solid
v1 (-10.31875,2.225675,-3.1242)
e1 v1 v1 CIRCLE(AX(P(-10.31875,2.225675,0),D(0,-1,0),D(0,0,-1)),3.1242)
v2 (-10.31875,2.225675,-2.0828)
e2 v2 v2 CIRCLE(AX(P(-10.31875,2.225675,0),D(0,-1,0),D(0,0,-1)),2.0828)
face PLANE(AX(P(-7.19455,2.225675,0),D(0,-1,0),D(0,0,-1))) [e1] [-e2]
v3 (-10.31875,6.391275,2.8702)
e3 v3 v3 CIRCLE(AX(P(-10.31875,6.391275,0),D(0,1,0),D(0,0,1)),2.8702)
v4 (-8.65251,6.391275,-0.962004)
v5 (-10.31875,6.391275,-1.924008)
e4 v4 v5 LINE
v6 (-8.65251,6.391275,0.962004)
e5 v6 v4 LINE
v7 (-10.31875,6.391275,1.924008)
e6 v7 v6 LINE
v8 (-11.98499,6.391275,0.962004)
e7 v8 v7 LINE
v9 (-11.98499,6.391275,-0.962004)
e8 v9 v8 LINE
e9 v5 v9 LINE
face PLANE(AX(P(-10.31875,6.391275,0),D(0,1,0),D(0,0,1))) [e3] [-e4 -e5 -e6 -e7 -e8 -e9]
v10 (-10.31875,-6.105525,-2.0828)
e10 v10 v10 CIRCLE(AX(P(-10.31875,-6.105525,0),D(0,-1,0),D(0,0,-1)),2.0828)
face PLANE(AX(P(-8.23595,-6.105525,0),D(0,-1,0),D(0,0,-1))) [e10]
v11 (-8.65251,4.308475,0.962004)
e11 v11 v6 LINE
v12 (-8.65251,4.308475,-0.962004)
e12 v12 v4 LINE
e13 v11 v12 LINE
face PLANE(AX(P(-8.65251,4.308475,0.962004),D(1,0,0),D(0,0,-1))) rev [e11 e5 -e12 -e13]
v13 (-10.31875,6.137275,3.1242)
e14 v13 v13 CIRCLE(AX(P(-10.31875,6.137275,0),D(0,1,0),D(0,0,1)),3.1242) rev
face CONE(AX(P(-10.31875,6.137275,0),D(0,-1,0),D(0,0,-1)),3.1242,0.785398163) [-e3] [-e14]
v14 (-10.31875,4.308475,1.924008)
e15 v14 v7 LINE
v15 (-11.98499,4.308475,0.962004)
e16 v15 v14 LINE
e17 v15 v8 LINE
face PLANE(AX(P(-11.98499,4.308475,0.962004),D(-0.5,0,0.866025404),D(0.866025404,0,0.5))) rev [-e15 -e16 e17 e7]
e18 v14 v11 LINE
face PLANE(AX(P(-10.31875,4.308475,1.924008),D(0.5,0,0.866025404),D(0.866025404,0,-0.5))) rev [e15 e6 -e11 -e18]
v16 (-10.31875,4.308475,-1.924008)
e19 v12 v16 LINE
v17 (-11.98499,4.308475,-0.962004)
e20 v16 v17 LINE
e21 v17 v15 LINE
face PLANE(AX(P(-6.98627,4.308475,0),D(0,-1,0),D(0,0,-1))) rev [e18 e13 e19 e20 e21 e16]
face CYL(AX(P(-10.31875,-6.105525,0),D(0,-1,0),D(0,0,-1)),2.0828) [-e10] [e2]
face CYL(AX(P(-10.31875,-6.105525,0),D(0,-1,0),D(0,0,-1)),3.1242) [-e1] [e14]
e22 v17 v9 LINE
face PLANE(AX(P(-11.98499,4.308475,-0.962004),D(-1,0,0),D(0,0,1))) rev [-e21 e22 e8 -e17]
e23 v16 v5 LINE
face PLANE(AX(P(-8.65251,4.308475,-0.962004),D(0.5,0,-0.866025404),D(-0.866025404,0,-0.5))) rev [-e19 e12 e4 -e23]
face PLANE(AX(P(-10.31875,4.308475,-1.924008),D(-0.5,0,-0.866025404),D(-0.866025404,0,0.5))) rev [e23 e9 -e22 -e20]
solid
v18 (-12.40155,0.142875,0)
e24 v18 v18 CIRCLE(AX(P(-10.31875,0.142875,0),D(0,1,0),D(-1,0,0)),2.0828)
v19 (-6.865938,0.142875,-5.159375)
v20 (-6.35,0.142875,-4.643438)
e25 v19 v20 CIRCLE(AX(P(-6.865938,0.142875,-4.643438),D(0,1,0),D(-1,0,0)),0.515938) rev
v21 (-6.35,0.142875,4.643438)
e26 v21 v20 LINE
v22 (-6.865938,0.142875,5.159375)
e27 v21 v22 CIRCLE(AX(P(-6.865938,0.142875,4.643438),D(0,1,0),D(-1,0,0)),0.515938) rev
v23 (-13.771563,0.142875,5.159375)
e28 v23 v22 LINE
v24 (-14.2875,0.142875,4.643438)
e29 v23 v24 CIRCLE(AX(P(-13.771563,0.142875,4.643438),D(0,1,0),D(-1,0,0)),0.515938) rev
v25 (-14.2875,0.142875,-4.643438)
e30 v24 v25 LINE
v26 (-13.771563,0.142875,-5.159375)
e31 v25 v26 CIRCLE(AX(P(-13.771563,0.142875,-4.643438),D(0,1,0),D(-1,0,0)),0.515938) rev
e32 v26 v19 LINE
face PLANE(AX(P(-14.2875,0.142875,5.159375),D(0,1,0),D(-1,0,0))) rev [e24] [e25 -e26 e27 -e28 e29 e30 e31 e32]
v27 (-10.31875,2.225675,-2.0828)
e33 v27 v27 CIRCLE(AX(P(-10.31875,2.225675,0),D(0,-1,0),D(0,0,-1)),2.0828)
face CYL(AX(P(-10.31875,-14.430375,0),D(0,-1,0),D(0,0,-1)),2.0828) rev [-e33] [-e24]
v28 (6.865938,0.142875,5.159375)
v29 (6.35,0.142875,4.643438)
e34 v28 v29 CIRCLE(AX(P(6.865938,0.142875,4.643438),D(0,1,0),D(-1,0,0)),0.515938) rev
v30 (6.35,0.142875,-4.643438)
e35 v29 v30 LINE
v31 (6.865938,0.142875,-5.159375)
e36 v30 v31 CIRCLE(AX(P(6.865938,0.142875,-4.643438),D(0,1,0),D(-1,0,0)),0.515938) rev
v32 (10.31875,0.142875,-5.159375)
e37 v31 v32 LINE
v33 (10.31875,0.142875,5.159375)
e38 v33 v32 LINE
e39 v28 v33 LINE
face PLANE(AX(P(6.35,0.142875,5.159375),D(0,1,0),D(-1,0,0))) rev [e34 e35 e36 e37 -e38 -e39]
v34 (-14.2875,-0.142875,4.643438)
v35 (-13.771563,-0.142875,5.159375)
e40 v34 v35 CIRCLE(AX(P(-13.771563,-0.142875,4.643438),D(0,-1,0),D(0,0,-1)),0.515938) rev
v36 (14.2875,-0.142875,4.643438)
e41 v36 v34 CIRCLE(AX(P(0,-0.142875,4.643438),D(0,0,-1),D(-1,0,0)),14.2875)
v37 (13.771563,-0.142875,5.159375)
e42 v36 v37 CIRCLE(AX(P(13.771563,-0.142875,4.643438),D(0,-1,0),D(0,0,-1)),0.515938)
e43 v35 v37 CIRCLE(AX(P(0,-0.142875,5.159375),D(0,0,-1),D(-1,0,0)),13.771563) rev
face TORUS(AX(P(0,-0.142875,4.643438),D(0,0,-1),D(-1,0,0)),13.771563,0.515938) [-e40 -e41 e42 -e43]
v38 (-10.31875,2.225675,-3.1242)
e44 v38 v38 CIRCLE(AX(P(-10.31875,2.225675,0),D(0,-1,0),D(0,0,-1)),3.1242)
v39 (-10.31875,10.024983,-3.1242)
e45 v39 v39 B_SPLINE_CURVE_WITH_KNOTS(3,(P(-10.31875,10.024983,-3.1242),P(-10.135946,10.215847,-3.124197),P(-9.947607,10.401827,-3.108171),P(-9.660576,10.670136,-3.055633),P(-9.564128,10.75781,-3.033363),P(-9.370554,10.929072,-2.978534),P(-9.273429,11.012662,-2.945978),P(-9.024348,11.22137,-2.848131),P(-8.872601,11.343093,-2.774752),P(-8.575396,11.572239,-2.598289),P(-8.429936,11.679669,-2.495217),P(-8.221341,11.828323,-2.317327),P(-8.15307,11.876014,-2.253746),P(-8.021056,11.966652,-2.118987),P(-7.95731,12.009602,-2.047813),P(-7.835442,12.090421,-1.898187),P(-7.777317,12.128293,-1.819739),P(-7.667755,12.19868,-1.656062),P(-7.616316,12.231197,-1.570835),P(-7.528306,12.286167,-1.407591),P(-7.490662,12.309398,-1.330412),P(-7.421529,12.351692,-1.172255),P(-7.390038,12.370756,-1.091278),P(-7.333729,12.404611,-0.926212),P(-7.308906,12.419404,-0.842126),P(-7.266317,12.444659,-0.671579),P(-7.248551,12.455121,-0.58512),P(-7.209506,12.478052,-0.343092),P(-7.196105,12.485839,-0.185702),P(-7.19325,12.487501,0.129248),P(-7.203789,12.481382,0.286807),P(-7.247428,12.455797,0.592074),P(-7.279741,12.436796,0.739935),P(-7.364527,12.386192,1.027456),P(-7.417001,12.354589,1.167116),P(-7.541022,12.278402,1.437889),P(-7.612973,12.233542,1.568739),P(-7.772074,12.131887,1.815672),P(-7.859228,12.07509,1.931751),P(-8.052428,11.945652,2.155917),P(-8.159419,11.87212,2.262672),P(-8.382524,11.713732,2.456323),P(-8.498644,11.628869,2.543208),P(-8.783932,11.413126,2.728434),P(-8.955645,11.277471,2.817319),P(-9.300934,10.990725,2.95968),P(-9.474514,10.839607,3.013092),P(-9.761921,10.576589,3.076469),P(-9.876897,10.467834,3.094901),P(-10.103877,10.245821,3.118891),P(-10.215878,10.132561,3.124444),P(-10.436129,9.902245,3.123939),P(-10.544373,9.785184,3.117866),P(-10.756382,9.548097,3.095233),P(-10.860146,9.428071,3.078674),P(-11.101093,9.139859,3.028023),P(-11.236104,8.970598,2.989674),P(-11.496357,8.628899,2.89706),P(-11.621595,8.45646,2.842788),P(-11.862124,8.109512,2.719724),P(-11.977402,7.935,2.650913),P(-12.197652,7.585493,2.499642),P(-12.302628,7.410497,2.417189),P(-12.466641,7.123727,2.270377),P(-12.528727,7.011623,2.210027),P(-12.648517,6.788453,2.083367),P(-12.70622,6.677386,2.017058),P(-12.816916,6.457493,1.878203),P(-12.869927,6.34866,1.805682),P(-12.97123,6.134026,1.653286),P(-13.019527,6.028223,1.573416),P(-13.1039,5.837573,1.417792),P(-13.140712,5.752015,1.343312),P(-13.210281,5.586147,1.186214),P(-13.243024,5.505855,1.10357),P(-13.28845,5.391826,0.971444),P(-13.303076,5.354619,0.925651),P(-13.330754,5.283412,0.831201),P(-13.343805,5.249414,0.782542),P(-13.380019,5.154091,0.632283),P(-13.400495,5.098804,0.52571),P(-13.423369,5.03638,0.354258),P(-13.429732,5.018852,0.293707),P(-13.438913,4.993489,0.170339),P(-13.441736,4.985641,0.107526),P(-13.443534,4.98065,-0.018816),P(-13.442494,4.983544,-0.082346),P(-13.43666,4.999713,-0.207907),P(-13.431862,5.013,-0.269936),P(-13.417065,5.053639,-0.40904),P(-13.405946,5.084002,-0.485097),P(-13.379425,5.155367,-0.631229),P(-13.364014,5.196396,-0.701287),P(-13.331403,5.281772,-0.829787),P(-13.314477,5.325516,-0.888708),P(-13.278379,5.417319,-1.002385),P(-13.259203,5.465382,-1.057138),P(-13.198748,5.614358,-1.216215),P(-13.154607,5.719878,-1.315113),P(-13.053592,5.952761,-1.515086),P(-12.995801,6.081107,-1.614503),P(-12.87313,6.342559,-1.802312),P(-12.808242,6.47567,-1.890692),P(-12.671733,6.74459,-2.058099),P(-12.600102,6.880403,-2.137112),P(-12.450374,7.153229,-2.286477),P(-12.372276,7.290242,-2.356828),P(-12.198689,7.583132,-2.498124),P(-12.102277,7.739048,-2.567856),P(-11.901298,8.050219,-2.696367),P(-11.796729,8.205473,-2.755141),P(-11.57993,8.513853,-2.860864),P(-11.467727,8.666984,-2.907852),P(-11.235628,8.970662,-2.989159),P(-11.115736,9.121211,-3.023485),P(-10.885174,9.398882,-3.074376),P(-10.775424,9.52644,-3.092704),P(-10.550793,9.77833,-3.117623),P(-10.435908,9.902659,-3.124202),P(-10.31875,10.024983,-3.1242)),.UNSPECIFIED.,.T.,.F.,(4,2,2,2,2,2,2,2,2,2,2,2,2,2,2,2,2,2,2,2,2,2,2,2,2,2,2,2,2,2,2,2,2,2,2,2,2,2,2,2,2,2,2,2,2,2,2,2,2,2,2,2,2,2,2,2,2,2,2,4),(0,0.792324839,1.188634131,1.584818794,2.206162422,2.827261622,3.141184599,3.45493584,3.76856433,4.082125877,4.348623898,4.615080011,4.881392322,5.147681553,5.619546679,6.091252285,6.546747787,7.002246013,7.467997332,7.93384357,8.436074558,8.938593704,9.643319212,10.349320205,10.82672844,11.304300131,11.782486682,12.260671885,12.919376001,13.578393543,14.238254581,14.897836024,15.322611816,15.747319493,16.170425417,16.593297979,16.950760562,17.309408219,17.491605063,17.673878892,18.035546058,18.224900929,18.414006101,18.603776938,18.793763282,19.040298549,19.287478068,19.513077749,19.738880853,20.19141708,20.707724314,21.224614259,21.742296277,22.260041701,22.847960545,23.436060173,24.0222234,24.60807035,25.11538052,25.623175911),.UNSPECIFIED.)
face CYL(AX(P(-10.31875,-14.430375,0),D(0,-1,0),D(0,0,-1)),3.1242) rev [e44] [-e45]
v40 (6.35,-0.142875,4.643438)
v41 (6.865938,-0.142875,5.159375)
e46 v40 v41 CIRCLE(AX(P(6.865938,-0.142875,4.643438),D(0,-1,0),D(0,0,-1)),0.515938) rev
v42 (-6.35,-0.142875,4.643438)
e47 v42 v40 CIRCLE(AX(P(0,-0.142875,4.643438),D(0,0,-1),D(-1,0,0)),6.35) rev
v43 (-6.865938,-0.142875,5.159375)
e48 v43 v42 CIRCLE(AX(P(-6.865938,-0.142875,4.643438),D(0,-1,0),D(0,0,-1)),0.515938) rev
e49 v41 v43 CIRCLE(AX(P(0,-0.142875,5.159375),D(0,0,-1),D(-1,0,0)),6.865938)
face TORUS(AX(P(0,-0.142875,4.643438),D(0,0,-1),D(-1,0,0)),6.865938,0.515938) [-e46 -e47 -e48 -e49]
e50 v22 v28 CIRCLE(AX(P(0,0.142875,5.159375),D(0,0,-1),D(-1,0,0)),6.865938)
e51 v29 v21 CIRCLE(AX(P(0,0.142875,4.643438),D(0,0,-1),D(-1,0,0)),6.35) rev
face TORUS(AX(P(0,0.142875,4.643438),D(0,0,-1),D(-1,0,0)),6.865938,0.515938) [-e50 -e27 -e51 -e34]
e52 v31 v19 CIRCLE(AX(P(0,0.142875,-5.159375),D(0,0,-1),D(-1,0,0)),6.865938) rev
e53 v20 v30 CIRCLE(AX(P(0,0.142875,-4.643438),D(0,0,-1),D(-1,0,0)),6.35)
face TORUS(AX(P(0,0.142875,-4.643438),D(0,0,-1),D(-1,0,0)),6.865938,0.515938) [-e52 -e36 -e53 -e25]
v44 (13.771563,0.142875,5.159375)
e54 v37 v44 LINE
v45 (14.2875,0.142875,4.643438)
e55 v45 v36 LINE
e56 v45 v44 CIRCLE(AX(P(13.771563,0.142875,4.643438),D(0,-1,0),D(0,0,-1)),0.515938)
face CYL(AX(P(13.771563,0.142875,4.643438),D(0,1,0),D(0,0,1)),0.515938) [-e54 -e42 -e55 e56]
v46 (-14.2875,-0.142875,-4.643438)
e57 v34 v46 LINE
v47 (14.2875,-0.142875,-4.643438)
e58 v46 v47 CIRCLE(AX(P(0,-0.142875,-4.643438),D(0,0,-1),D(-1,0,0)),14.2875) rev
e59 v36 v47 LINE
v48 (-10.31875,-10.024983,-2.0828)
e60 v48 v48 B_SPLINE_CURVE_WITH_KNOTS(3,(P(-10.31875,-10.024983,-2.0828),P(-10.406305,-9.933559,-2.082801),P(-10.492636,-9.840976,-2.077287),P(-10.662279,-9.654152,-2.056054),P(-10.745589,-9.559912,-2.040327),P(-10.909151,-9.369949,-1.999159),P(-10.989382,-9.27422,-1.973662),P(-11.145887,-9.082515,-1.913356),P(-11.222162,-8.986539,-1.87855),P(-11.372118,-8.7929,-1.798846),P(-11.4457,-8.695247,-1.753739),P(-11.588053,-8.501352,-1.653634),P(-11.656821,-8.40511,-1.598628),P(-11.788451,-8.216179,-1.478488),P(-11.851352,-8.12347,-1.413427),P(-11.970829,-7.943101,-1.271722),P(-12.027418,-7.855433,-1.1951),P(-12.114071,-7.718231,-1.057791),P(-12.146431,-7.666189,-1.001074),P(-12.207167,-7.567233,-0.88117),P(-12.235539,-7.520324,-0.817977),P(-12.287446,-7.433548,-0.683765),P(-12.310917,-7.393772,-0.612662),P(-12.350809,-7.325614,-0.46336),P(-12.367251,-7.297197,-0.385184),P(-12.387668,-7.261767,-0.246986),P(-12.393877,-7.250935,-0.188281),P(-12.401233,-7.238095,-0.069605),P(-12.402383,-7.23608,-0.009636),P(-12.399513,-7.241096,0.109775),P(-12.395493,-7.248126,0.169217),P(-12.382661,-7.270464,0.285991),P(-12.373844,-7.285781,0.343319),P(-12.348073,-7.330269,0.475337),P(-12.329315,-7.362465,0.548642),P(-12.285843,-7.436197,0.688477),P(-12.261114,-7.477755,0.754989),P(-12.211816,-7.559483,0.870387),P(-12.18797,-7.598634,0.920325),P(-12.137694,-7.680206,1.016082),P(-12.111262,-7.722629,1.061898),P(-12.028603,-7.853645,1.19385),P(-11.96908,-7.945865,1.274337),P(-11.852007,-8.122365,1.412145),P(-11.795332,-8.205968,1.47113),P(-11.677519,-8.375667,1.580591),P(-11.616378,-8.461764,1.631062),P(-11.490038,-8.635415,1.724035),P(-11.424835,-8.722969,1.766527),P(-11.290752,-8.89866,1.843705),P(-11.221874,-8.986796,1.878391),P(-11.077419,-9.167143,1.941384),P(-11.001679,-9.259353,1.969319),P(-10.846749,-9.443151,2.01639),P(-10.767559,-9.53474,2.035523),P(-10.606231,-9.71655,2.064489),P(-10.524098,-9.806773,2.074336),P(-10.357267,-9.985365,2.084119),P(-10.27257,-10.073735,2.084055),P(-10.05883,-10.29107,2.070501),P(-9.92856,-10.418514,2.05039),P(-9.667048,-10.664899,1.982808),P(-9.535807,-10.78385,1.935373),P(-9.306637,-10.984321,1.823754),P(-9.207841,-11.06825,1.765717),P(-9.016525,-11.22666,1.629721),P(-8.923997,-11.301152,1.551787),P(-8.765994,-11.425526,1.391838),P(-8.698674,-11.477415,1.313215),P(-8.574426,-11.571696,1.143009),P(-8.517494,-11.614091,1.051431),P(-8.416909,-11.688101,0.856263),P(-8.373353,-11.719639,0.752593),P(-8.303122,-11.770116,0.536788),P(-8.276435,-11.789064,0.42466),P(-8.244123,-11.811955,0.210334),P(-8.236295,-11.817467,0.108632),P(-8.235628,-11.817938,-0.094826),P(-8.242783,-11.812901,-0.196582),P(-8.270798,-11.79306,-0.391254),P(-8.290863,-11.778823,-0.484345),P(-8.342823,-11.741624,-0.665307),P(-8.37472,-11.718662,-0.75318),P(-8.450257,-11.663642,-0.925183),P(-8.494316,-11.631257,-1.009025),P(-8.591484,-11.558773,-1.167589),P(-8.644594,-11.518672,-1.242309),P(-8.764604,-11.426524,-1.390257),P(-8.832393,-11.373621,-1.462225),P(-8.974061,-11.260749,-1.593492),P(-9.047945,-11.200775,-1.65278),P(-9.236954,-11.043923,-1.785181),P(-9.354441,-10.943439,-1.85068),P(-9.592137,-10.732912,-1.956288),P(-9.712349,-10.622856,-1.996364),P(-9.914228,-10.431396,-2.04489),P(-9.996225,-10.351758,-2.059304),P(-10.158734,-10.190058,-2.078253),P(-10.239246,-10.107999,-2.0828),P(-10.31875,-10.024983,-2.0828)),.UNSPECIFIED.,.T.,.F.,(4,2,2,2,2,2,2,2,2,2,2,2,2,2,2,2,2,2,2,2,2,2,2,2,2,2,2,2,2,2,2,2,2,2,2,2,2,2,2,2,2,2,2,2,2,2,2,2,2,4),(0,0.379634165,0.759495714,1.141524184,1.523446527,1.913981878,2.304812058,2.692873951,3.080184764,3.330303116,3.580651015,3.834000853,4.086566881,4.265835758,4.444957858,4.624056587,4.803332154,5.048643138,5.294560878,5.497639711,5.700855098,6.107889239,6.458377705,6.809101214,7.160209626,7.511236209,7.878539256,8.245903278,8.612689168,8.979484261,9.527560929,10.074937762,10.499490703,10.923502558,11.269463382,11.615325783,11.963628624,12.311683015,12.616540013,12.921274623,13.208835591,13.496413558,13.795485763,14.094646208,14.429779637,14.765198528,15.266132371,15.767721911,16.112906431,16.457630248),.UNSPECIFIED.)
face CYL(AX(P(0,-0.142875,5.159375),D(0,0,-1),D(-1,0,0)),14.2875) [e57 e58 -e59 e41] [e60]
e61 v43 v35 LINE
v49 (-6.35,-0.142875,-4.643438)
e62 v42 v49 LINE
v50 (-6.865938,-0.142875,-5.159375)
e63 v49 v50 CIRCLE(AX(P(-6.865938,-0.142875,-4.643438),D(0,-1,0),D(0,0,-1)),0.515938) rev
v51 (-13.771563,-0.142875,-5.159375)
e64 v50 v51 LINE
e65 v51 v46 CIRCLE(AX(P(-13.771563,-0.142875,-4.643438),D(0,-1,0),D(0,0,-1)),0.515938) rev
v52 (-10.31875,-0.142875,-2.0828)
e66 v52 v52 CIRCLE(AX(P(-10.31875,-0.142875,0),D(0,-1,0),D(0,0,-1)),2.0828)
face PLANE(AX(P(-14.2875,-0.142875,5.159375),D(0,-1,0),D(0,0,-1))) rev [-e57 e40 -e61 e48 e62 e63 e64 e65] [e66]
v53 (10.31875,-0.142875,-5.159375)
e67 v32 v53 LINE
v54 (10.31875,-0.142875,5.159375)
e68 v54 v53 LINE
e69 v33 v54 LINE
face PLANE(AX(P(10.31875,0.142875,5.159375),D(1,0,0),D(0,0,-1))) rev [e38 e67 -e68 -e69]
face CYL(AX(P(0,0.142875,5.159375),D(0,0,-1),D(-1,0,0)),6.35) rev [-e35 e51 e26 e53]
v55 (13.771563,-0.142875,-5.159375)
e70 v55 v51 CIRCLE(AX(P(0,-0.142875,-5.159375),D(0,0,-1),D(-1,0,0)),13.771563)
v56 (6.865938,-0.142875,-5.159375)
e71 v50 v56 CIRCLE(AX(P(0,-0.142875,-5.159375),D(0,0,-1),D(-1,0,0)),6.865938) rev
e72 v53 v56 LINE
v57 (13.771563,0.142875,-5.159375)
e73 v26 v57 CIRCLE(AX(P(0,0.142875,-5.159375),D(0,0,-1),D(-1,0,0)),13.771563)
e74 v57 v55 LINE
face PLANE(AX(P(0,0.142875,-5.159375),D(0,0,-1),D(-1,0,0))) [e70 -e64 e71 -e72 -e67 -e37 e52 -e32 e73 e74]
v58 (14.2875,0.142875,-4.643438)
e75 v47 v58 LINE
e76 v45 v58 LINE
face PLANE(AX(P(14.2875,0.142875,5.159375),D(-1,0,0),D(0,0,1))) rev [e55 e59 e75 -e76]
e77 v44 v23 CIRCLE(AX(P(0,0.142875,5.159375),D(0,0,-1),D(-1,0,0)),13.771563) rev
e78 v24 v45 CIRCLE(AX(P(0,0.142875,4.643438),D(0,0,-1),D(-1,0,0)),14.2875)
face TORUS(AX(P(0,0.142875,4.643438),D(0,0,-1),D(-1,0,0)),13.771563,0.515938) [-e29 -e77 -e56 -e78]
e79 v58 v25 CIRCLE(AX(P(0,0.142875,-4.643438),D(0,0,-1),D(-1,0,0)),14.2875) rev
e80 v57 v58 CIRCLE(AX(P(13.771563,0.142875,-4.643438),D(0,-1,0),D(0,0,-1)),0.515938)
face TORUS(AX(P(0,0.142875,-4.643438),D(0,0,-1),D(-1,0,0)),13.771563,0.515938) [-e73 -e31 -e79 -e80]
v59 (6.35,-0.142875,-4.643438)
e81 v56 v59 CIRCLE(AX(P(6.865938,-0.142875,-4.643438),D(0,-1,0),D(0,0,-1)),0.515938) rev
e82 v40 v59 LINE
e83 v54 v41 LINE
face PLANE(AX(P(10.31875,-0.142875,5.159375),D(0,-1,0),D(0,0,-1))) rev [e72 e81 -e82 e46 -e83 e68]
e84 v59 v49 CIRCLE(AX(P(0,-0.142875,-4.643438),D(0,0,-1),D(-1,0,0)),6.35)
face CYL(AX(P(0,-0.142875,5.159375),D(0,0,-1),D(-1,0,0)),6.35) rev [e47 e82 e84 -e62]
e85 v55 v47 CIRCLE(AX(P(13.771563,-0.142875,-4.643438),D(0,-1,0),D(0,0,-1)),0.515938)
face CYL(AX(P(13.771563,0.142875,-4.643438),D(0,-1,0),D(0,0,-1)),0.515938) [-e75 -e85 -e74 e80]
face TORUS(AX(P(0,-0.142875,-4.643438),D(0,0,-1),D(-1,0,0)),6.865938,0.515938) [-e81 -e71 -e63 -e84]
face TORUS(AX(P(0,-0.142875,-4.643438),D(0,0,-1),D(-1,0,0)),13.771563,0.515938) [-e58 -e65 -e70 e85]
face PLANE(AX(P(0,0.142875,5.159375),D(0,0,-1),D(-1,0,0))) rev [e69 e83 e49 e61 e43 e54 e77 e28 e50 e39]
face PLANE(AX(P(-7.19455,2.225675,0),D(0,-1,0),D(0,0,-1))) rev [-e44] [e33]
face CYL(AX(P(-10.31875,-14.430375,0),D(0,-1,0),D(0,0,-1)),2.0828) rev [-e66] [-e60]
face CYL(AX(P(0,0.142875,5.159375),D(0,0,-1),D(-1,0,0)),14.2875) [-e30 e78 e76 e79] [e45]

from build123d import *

# Parameters (mm, degrees)
EXTRUDE1_DEPTH     = 5.159375
CUT_EXTRUDE2_DEPTH = 2.0828
FILLET1_R          = 0.5159375
FILLET2_R          = 0.5159375
CHAMFER2_SIZE      = 0.254


with BuildPart() as part:
    # Sketch1 → Extrude1 (new, symmetric)
    with BuildSketch(Plane.XY):
        with BuildLine():
            Line((-14.2875, 0.142875), (-6.35, 0.142875))
            ThreePointArc((-6.35, 0.142875), (0, 6.492875), (6.35, 0.142875))
            Line((6.35, 0.142875), (10.31875, 0.142875))
            Line((10.31875, 0.142875), (10.31875, -0.142875))
            Line((10.31875, -0.142875), (6.35, -0.142875))
            ThreePointArc((6.35, -0.142875), (0, -6.492875), (-6.35, -0.142875))
            Line((-6.35, -0.142875), (-14.2875, -0.142875))
            ThreePointArc((-14.2875, -0.142875), (0, -14.430375), (14.2875, -0.142875))
            Line((14.2875, -0.142875), (14.2875, 0.142875))
            ThreePointArc((14.2875, 0.142875), (0, 14.430375), (-14.2875, 0.142875))
        make_face()
    extrude(amount=EXTRUDE1_DEPTH, both=True)

    # Sketch4 → Cut-Revolve1 (revolve, cut)
    with BuildSketch(Plane.XY):
        Polygon((-10.31875, 14.430375), (-7.19455, 14.430375), (-7.19455, 2.225675), (-8.23595, 2.225675), (-8.23595, -14.430375), (-10.31875, -14.430375), align=None)
    revolve(axis=Axis((-10.31875, -14.430375, 0), (0, 1, 0)), mode=Mode.SUBTRACT)

    # Fillet1
    fillet1_edges = [part.edges().sort_by_distance(p)[0] for p in [
        (0, 6.492875, -5.159375),
        (0, 6.492875, 5.159375),
        (0, 14.430375, -5.159375),
        (0, 14.430375, 5.159375),
        (0, -14.430375, -5.159375),
        (0, -14.430375, 5.159375),
        (14.2875, 0, -5.159375),
        (14.2875, 0, 5.159375),
    ]]
    fillet(fillet1_edges, radius=FILLET1_R)

    # Fillet2
    fillet2_edges = [part.edges().sort_by_distance(p)[0] for p in [
        (0, -6.492875, -5.159375),
        (0, -6.492875, 5.159375),
    ]]
    fillet(fillet2_edges, radius=FILLET2_R)


with BuildPart() as body_2:
    # Sketch6 → Revolve1 (revolve)
    with BuildSketch(Plane.XY):
        Polygon((-10.31875, 6.391275), (-7.19455, 6.391275), (-7.19455, 2.225675), (-8.23595, 2.225675), (-8.23595, -6.105525), (-10.31875, -6.105525), align=None)
    revolve(axis=Axis((-10.31875, -6.105525, 0), (0, 1, 0)))

    # Sketch7 → Cut-Extrude2 (cut)
    with BuildSketch(Plane(origin=(0, 6.391275, 0), x_dir=(-1, 0, 0), z_dir=(0, 1, 0))):
        Polygon((10.31875, -1.924008225), (11.98499, -0.962004113), (11.98499, 0.962004113), (10.31875, 1.924008225), (8.65251, 0.962004113), (8.65251, -0.962004113), align=None)
    extrude(amount=-CUT_EXTRUDE2_DEPTH, mode=Mode.SUBTRACT)

    # Chamfer2
    chamfer2_edges = [body_2.edges().sort_by_distance(p)[0] for p in [
        (-13.44295, 6.391275, 0),
    ]]
    chamfer(chamfer2_edges, length=CHAMFER2_SIZE)


solid = Compound([part.part, body_2.part])
